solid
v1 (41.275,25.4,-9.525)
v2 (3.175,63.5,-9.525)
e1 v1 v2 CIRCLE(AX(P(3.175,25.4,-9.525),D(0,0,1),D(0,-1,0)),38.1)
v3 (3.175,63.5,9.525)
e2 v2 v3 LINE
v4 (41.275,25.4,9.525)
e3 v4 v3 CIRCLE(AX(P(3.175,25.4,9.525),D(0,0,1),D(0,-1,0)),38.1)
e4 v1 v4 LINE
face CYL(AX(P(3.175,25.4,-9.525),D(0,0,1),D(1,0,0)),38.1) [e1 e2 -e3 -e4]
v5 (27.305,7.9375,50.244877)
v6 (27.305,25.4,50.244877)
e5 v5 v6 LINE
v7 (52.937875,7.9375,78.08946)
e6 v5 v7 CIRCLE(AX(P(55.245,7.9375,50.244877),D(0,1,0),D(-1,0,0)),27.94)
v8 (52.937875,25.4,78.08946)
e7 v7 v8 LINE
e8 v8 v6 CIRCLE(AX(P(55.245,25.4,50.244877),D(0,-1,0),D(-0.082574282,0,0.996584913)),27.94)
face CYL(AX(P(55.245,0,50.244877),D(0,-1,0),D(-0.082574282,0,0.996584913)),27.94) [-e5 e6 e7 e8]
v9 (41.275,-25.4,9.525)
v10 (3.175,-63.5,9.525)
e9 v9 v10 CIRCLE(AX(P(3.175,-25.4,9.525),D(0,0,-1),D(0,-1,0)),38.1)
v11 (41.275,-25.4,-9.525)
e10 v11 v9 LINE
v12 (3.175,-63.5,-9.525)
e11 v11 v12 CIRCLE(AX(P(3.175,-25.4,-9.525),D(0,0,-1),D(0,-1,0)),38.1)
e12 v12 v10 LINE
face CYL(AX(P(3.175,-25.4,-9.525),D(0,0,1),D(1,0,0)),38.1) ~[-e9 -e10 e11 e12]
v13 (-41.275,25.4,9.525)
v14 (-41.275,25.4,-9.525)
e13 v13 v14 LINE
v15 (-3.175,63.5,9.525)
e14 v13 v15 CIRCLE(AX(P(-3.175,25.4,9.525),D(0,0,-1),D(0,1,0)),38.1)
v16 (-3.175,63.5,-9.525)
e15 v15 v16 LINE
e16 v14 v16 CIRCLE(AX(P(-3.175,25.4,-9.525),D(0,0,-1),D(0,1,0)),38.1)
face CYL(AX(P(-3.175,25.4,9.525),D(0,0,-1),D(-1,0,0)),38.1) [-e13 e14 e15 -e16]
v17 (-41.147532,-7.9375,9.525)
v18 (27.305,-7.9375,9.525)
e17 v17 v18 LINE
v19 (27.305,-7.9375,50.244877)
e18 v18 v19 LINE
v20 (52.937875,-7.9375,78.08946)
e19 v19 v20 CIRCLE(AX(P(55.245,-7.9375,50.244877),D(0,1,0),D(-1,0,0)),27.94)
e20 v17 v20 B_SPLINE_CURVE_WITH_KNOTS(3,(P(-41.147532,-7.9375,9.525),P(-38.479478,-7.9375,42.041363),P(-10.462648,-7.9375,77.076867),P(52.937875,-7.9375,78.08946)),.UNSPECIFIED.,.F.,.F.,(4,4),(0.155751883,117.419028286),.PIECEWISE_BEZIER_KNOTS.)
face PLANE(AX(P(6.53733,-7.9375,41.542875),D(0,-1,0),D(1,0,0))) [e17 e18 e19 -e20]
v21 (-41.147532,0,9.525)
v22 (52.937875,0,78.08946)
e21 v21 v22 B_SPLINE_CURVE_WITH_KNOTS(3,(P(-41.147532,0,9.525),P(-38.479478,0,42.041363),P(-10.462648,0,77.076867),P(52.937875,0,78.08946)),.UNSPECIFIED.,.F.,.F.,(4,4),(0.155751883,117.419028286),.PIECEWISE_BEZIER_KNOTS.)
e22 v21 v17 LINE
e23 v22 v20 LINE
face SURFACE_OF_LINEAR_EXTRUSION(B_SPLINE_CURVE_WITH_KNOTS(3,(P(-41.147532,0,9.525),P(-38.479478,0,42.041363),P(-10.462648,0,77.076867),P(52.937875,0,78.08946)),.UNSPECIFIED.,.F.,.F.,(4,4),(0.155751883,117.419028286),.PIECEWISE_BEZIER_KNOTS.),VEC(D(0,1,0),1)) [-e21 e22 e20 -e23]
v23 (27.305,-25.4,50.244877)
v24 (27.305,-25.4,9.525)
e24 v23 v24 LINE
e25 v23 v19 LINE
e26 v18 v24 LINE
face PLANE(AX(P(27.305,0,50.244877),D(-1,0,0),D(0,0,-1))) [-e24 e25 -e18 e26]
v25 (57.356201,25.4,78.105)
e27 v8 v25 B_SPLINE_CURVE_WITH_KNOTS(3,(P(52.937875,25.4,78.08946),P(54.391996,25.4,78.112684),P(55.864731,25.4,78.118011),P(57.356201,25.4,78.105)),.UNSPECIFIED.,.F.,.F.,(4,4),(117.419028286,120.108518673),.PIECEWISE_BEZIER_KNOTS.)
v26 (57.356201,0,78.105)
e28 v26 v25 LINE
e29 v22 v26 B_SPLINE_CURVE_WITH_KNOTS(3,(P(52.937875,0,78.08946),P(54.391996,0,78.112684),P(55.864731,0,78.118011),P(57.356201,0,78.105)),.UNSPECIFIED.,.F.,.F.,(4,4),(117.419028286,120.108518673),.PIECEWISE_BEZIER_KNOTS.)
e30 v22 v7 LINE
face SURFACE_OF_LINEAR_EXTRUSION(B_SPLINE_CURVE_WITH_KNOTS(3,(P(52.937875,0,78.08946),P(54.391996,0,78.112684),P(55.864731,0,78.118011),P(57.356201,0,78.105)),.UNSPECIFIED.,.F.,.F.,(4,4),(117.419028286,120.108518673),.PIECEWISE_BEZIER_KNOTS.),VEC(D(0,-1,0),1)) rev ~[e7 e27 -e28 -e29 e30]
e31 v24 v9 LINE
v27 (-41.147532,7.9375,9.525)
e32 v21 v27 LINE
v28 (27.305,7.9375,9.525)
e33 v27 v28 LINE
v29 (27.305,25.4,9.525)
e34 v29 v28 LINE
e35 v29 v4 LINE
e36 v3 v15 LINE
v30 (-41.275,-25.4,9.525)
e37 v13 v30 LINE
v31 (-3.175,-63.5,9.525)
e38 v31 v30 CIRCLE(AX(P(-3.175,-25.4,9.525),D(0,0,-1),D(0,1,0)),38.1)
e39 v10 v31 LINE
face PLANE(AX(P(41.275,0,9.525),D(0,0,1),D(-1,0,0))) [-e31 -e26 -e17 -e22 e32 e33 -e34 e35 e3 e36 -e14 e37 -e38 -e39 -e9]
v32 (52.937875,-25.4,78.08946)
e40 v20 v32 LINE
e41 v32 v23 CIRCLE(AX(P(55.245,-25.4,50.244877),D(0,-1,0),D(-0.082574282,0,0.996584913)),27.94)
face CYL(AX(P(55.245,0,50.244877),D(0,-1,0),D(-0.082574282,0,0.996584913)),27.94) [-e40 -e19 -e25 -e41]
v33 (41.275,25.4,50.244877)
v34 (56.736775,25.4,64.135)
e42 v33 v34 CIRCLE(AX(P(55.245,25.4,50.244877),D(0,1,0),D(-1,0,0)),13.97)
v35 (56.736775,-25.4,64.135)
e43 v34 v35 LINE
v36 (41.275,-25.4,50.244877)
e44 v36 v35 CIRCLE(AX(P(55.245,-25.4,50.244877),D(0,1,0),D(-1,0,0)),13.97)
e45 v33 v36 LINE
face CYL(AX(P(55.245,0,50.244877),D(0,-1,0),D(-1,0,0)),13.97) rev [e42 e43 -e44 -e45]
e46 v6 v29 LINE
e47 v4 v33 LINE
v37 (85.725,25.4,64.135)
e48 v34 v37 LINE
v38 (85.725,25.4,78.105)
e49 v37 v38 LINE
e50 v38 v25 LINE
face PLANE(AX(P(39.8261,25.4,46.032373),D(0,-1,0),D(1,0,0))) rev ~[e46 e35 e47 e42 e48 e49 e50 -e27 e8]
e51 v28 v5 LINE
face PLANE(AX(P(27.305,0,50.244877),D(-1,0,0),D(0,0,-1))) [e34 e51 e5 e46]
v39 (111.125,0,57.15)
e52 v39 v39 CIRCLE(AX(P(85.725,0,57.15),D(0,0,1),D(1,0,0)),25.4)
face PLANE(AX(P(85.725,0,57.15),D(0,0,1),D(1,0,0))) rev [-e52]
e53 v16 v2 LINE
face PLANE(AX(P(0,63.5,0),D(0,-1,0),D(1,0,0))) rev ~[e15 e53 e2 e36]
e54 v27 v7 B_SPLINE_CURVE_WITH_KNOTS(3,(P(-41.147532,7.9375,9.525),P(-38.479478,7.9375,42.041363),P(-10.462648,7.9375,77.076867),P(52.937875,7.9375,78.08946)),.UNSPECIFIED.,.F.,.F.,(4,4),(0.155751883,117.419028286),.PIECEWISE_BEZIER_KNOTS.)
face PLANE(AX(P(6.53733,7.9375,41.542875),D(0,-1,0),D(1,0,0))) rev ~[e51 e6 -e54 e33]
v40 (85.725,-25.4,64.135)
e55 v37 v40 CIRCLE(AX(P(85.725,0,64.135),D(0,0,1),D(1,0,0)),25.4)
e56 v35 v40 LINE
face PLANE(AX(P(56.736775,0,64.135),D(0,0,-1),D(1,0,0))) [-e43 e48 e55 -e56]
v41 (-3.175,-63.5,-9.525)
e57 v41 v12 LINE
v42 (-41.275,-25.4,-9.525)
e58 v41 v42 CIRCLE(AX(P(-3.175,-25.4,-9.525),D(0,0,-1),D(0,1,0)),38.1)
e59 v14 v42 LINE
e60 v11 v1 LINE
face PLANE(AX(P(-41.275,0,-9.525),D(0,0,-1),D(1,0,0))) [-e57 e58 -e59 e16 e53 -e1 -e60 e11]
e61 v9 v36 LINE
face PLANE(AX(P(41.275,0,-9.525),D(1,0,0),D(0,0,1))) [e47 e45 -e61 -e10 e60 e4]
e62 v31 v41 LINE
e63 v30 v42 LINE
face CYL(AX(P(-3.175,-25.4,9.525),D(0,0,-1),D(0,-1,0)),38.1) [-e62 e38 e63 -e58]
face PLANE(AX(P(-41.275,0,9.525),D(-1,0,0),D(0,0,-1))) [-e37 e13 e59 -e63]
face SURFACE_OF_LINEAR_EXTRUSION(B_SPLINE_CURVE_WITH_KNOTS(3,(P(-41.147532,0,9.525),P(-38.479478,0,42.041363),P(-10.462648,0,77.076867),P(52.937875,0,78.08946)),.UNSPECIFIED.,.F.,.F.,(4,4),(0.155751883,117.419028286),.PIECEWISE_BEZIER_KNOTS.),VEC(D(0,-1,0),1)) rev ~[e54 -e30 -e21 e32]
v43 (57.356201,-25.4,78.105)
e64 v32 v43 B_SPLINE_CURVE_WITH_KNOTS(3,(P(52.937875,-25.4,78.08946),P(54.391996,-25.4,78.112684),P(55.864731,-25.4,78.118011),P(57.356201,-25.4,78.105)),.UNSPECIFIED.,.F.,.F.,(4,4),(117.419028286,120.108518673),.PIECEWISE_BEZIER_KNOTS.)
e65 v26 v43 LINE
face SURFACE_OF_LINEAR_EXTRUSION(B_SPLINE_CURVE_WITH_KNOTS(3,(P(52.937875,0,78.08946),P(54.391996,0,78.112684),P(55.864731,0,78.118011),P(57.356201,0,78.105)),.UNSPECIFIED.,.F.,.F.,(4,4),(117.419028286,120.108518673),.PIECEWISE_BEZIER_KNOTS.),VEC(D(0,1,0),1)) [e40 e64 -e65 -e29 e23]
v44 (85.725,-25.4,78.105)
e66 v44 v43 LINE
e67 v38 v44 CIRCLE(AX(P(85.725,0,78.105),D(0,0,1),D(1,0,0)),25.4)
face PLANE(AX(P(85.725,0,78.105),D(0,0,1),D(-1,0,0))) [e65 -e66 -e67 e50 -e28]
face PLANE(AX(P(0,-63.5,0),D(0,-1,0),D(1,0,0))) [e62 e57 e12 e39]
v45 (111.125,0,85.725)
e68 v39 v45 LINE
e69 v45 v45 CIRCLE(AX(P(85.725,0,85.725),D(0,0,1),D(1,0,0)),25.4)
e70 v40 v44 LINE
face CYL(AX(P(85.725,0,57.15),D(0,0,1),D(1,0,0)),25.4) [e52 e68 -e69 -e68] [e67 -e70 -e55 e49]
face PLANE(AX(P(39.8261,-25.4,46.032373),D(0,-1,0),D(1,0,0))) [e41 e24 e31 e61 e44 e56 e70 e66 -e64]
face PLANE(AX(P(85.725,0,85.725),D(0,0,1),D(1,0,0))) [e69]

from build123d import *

# Parameters (mm, degrees)
F1_DEPTH = 63.5
F2_DEPTH = 25.4
F3_DEPTH = 7.9375
F5_R     = 38.1


with BuildPart() as f1:
    # F0 (on Front) → F1 (new body, symmetric)
    with BuildSketch(Plane.XZ):
        Polygon((41.275, 9.525), (27.305, 9.525), (-41.1475321427, 9.525), (-41.275, 9.525), (-41.275, -9.525), (41.275, -9.525), align=None)
    extrude(amount=F1_DEPTH, both=True)

    # F0 (on Front) → F2 (join, symmetric)
    with BuildSketch(Plane.XZ):
        with BuildLine():
            Line((27.305, 50.2448773877), (27.305, 9.525))
            Line((27.305, 9.525), (41.275, 9.525))
            Line((41.275, 9.525), (41.275, 50.2448773877))
            ThreePointArc((41.275, 50.2448773877), (45.9090266229, 60.6372063424), (56.7367753904, 64.135))
            Line((56.7367753904, 64.135), (60.325, 64.135))
            Line((60.325, 64.135), (60.325, 78.105))
            Line((60.325, 78.105), (57.3562006129, 78.105))
            add(Edge.make_bspline(
                [(52.937874551, 78.0894598439), (54.3919964318, 78.1126841505), (55.864731429, 78.1180111613), (57.3562006129, 78.105)],
                knots=[117.4190282855, 117.4190282855, 117.4190282855, 117.4190282855, 120.108518673, 120.108518673, 120.108518673, 120.108518673], degree=3))
            ThreePointArc((52.937874551, 78.0894598439), (34.6889220053, 69.1681767162), (27.305, 50.2448773877))
        make_face()
        Polygon((60.325, 78.105), (60.325, 64.135), (85.725, 64.135), (85.725, 71.4375), (85.725, 78.105), align=None)
    extrude(amount=F2_DEPTH, both=True)

    # F0 (on Front) → F3 (join, symmetric)
    with BuildSketch(Plane.XZ):
        with BuildLine():
            Line((-41.1475321427, 9.525), (27.305, 9.525))
            Line((27.305, 9.525), (27.305, 50.2448773877))
            ThreePointArc((27.305, 50.2448773877), (34.6889220053, 69.1681767162), (52.937874551, 78.0894598439))
            add(Edge.make_bspline(
                [(-41.1475321427, 9.525), (-38.4794783387, 42.0413634319), (-10.4626480253, 77.0768671657), (52.937874551, 78.0894598439)],
                knots=[0.1557518826, 0.1557518826, 0.1557518826, 0.1557518826, 117.4190282855, 117.4190282855, 117.4190282855, 117.4190282855], degree=3))
        make_face()
    extrude(amount=F3_DEPTH, both=True)

    # F0 (on Front) → F4 (revolve)
    with BuildSketch(Plane.XZ):
        Polygon((85.725, 71.4375), (85.725, 64.135), (85.725, 57.15), (111.125, 57.15), (111.125, 85.725), (85.725, 85.725), (85.725, 78.105), align=None)
    revolve(axis=Axis((85.725, 0, 71.4375), (0, 0, 1)))

    # F5
    f5_edges = [f1.edges().sort_by_distance(p)[0] for p in [
        (-41.275, -63.5, 0),
        (41.275, -63.5, 0),
        (41.275, 63.5, 0),
        (-41.275, 63.5, 0),
    ]]
    fillet(f5_edges, radius=F5_R)


solid = f1.part
